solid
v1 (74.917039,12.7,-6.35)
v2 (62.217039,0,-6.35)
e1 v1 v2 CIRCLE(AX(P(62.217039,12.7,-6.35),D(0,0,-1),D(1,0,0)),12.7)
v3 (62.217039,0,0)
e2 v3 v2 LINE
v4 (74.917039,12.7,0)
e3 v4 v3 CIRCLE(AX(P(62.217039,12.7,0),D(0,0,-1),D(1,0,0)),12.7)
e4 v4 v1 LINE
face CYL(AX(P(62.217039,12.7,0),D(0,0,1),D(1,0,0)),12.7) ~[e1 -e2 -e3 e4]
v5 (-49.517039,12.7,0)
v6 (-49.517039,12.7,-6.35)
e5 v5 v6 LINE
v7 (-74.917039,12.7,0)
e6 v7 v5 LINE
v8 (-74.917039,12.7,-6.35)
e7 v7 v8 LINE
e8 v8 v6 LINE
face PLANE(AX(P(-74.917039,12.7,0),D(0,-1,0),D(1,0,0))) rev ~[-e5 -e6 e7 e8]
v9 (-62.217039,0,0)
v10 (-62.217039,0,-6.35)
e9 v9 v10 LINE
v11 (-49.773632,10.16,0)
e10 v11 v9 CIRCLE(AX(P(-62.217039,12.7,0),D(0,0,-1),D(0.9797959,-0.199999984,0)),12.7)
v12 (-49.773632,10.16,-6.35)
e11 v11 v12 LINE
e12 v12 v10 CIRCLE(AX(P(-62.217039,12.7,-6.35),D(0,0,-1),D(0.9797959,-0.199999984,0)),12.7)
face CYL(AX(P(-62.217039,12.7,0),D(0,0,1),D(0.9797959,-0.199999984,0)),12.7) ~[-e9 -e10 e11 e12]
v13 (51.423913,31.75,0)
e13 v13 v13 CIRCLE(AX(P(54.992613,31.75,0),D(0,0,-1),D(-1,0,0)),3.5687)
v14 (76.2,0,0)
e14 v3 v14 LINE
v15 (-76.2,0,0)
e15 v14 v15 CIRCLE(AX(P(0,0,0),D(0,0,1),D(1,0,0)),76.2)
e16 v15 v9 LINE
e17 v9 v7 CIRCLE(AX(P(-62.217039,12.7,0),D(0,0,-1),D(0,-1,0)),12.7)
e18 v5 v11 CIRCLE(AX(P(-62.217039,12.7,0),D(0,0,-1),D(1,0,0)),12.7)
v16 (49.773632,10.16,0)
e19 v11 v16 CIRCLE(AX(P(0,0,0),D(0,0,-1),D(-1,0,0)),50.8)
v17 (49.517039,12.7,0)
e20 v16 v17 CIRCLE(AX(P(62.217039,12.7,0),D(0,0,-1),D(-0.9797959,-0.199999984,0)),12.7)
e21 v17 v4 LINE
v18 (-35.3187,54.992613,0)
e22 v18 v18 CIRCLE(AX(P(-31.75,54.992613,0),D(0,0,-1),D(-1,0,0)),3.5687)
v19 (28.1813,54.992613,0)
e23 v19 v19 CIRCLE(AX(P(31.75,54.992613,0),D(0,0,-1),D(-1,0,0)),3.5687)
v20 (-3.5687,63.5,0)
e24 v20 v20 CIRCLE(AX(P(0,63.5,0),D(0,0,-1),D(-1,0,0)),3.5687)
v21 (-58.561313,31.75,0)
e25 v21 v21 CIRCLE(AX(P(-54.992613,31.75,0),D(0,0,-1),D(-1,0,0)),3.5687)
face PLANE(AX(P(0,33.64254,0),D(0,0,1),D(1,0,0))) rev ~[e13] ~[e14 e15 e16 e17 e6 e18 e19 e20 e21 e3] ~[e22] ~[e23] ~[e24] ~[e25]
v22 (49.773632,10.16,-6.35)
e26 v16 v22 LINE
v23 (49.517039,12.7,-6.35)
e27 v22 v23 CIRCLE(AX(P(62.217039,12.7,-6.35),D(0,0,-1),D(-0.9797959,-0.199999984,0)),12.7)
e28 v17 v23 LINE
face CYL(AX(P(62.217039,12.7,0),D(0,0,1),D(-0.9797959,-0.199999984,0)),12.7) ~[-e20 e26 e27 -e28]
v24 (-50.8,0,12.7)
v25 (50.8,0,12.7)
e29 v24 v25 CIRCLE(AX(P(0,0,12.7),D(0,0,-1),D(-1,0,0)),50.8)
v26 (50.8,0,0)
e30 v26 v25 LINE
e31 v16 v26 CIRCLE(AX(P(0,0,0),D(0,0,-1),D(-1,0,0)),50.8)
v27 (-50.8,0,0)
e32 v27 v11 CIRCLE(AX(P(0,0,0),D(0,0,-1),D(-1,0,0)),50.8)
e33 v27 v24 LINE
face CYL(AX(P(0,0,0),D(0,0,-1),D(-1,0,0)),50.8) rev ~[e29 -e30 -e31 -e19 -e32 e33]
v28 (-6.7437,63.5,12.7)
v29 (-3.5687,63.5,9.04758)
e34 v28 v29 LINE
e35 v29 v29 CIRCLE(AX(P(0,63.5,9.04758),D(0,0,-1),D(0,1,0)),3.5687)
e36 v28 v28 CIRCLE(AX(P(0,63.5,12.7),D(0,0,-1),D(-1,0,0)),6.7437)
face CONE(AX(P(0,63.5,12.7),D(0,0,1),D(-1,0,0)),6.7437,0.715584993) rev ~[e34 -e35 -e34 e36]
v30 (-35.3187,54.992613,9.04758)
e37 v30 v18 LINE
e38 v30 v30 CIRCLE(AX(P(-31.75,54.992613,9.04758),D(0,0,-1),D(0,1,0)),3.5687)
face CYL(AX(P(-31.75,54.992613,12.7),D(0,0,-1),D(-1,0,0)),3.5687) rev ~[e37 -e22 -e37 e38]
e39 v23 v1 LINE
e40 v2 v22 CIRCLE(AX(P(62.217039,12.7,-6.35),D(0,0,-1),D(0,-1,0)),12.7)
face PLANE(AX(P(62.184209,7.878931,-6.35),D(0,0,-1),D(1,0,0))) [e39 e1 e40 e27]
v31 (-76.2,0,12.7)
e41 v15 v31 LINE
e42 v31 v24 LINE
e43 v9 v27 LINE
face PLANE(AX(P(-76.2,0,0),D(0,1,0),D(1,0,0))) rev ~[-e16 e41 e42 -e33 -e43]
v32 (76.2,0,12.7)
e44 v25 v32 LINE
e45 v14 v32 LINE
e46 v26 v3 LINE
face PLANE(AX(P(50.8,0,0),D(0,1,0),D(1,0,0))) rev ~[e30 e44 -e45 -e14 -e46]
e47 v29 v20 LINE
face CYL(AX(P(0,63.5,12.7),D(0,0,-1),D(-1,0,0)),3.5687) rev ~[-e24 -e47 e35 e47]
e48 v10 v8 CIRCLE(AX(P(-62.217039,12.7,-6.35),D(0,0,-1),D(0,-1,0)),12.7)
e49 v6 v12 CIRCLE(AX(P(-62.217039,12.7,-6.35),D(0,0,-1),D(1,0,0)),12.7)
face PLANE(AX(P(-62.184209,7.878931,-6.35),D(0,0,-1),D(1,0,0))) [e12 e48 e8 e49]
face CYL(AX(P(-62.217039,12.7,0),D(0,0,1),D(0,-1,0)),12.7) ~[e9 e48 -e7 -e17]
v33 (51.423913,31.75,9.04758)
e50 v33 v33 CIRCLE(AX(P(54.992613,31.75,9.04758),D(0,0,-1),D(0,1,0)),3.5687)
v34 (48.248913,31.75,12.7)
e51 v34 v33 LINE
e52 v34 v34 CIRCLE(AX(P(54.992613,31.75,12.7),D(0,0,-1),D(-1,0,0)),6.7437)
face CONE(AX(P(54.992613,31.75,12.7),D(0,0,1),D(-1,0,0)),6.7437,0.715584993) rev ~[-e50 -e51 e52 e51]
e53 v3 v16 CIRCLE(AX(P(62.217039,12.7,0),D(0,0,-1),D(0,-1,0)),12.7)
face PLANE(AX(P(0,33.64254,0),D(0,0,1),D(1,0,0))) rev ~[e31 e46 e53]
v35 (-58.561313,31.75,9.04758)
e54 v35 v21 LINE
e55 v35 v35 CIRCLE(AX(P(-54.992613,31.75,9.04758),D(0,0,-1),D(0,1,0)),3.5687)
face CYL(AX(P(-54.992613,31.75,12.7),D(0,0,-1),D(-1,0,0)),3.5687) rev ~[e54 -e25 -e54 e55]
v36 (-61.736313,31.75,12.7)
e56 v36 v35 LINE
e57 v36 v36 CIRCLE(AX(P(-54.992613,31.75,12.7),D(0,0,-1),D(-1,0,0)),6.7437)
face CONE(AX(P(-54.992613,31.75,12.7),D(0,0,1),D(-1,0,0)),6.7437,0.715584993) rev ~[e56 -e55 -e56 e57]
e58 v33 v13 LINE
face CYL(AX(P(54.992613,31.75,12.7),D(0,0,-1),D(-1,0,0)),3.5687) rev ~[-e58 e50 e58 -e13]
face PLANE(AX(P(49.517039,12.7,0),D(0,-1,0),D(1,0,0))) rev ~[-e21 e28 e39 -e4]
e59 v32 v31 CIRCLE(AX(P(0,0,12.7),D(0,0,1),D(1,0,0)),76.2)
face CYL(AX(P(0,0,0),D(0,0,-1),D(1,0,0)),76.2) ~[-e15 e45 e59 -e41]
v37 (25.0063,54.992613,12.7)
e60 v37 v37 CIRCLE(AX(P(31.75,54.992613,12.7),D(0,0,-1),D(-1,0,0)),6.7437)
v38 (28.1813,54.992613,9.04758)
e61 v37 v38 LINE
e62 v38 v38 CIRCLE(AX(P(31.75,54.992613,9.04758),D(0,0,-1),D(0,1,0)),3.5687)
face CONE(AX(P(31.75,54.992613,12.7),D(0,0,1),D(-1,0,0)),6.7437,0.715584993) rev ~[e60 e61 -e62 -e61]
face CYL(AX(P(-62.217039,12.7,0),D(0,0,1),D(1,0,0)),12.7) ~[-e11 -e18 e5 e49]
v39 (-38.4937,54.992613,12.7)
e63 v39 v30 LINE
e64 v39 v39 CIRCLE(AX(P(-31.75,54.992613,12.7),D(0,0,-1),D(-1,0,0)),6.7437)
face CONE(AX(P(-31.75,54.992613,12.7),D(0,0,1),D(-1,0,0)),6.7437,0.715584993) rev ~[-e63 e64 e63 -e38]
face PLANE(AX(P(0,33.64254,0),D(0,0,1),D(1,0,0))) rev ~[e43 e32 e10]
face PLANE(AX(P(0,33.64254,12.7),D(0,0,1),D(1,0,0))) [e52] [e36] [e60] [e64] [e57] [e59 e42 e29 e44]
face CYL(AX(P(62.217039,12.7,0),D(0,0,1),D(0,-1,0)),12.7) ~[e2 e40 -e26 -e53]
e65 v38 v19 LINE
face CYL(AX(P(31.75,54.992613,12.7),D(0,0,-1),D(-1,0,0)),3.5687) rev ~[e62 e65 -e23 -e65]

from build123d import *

# Parameters (mm, degrees)
F1_DEPTH       = 12.7
F3_DEPTH       = 6.35
F5_D           = 7.1374
F5_CSINK_D     = 13.4874
F5_CSINK_ANGLE = 82


with BuildPart() as f1:
    # F0 (on Top) → F1 (new body)
    with BuildSketch(Plane.XY):
        with BuildLine():
            Line((-76.2, 0), (-50.8, 0))
            ThreePointArc((-50.8, 0), (0, 50.8), (50.8, 0))
            Line((50.8, 0), (76.2, 0))
            ThreePointArc((76.2, 0), (0, 76.2), (-76.2, 0))
        make_face()
    extrude(amount=F1_DEPTH)

    # F2 (on face) → F3 (join)
    with BuildSketch(Plane(origin=(0, 0, 0), x_dir=(1, 0, 0), z_dir=(0, 0, -1))):
        with BuildLine():
            Line((-74.9170394667, -12.7), (-49.5170394667, -12.7))
            ThreePointArc((-49.5170394667, -12.7), (-49.581350313, -11.4235362865), (-49.7736315316, -10.1600002047))
            ThreePointArc((-49.7736315316, -10.1600002047), (-54.1848541289, -2.8626223667), (-62.2170394667, 0))
            ThreePointArc((-62.2170394667, 0), (-71.1972955878, -3.7197438789), (-74.9170394667, -12.7))
        make_face()
        with BuildLine():
            ThreePointArc((62.2170394667, 0), (54.1848541308, -2.8626223652), (49.7736315325, -10.1600001999))
            ThreePointArc((49.7736315325, -10.1600001999), (49.5813503133, -11.423536284), (49.5170394667, -12.7))
            Line((49.5170394667, -12.7), (74.9170394667, -12.7))
            ThreePointArc((74.9170394667, -12.7), (71.1972955878, -3.7197438789), (62.2170394667, 0))
        make_face()
    extrude(amount=F3_DEPTH)

    # F5 (through all)
    with Locations(Plane.XY.offset(12.7)):
        with Locations((-54.9926131403, 31.75), (-31.75, 54.9926131403), (0, 63.5), (31.75, 54.9926131403), (54.9926131403, 31.75)):
            CounterSinkHole(F5_D / 2, F5_CSINK_D / 2, counter_sink_angle=F5_CSINK_ANGLE)


solid = f1.part
